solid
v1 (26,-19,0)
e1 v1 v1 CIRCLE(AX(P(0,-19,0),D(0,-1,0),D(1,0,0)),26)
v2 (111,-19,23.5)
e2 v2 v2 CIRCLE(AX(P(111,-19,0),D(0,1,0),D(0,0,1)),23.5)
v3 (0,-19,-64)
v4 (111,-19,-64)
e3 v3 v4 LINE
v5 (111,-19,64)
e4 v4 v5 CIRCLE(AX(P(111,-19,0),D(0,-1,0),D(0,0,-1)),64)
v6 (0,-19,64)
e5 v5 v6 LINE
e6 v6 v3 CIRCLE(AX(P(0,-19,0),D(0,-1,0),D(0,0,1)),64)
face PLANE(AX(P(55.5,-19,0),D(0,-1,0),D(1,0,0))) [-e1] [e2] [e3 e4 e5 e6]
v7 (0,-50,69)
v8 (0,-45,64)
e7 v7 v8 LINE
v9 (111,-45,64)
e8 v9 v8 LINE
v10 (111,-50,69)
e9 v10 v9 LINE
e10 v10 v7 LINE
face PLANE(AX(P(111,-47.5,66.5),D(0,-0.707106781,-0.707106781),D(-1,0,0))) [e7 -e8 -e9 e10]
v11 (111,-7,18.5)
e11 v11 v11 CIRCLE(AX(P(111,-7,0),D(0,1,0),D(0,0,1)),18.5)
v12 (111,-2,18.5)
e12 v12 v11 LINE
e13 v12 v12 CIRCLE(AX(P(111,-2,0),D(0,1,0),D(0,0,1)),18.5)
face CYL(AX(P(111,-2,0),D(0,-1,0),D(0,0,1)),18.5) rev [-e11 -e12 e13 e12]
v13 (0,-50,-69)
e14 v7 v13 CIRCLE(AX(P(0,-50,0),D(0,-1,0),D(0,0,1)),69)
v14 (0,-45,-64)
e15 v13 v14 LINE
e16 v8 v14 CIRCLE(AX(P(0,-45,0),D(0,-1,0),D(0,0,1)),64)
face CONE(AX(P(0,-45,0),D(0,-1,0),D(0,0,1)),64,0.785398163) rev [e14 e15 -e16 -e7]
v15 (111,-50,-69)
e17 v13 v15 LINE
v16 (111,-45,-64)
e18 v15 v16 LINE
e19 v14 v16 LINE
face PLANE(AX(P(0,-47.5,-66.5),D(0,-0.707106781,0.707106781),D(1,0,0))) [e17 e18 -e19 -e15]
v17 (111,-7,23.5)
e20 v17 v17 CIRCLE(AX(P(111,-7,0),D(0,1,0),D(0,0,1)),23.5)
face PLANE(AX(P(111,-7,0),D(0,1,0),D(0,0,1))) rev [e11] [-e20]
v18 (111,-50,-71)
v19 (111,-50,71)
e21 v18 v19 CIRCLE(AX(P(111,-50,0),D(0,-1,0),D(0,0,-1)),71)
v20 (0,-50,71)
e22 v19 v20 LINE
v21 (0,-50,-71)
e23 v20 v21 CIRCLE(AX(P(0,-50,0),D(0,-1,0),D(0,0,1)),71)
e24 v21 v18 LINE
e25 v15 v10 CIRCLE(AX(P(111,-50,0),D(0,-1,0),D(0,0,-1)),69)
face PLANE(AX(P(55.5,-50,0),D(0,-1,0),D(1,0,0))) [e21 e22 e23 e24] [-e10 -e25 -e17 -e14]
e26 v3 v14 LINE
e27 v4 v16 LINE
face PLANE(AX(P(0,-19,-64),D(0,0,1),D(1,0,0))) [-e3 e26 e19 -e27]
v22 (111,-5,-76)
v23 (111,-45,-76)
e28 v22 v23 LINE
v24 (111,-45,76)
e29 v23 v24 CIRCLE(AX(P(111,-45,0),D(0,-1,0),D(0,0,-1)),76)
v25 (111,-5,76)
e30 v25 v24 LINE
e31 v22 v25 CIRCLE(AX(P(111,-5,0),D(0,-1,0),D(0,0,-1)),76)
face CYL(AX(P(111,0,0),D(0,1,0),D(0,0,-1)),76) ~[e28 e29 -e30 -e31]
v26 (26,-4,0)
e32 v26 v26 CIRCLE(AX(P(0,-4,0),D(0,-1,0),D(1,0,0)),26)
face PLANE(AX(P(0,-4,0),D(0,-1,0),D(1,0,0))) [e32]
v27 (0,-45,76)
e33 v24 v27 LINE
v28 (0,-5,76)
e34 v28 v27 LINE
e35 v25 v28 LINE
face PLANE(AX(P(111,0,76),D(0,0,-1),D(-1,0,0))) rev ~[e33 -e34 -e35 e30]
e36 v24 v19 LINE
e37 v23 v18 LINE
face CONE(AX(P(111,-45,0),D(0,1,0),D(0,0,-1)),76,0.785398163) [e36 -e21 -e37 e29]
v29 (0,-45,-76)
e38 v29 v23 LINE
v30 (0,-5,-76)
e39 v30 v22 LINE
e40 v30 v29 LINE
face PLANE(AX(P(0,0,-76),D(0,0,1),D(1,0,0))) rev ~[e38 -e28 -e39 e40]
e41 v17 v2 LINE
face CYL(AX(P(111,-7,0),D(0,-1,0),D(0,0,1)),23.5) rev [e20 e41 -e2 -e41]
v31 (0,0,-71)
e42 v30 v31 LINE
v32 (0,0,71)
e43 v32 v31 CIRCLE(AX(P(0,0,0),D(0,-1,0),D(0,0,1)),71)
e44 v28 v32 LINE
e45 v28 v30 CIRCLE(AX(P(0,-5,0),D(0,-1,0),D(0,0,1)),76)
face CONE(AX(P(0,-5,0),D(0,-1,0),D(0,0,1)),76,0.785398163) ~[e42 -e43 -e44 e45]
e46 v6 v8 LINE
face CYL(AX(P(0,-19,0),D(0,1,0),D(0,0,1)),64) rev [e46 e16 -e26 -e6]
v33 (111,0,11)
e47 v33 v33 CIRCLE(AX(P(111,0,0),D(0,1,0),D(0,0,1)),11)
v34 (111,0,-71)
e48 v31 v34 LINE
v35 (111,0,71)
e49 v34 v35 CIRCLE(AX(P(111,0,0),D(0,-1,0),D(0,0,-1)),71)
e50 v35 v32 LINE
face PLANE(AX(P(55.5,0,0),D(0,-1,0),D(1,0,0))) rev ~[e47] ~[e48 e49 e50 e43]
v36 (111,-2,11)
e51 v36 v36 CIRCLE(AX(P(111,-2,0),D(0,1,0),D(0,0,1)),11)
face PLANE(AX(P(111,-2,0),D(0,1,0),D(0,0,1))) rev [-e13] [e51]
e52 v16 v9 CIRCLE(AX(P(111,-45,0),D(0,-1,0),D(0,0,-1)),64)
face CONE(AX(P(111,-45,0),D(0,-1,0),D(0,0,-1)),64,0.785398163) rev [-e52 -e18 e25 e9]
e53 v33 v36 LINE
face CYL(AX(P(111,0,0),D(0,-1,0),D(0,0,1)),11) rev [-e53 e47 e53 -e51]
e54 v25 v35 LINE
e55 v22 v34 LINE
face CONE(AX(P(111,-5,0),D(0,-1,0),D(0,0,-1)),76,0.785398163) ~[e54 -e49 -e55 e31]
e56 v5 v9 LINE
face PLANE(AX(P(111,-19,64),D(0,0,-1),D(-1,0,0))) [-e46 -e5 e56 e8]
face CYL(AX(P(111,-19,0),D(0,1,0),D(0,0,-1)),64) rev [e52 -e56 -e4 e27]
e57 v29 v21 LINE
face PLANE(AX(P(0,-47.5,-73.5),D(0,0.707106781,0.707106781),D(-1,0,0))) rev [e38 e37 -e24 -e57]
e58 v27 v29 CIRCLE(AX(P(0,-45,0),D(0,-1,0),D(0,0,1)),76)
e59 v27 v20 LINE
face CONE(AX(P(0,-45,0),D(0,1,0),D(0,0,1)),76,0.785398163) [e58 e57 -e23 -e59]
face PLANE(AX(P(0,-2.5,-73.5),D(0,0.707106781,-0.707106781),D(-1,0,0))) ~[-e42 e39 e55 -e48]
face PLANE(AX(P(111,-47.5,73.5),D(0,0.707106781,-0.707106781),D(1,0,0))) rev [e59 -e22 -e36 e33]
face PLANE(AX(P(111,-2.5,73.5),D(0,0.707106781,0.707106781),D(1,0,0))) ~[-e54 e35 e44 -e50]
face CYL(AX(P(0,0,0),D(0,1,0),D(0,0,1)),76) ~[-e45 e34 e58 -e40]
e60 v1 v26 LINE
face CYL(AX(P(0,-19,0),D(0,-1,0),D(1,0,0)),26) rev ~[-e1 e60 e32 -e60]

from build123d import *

# Parameters (mm, degrees)
F1_DEPTH = 50
F4_DEPTH = 60
F5_R     = 26
F6_DEPTH = 15
F10_SIZE = 5
F11_SIZE = 5
F12_SIZE = 5


with BuildPart() as f1:
    # F0 (on Front) → F1 (new body)
    with BuildSketch(Plane.XZ):
        with BuildLine():
            Line((111, 76), (0, 76))
            ThreePointArc((0, 76), (-76, 0), (0, -76))
            Line((0, -76), (111, -76))
            ThreePointArc((111, -76), (187, 0), (111, 76))
        make_face()
    extrude(amount=F1_DEPTH)

    # F3 (on offset) + F1_face (on face) → F4 (cut)
    with BuildSketch(Plane.XZ.offset(19)):
        with BuildLine():
            Line((111, 64), (0, 64))
            ThreePointArc((0, 64), (-64, 0), (0, -64))
            Line((0, -64), (111, -64))
            ThreePointArc((111, -64), (175, 0), (111, 64))
        make_face()
    with BuildSketch(Plane(origin=(55.5, -50, 0), x_dir=(1, 0, 0), z_dir=(0, -1, 0))):
        with BuildLine():
            Line((55.5, 76), (-55.5, 76))
            ThreePointArc((-55.5, 76), (-131.5, 0), (-55.5, -76))
            Line((-55.5, -76), (55.5, -76))
            ThreePointArc((55.5, -76), (131.5, 0), (55.5, 76))
        make_face()
    extrude(amount=F4_DEPTH, mode=Mode.SUBTRACT)

    # F5 (on offset) → F6 (cut)
    with BuildSketch(Plane.XZ.offset(19)):
        Circle(F5_R)
    extrude(amount=-F6_DEPTH, mode=Mode.SUBTRACT)

    # F8 (on offset) → F9 (revolve, cut)
    with BuildSketch(Plane.YZ.offset(111)):
        Polygon((0, 0), (0, 11), (-2, 11), (-2, 18.5), (-7, 18.5), (-7, 23.5), (-19, 23.5), (-19, 0), align=None)
    revolve(axis=Axis((111, -9.5, 0), (0, 1, 0)), mode=Mode.SUBTRACT)

    # F10
    f10_edges = [f1.edges().sort_by_distance(p)[0] for p in [
        (55.5, 0, 76),
        (187, 0, 0),
        (-76, 0, 0),
        (55.5, 0, -76),
    ]]
    chamfer(f10_edges, length=F10_SIZE)

    # F11
    f11_edges = [f1.edges().sort_by_distance(p)[0] for p in [
        (55.5, -50, 76),
        (-76, -50, 0),
        (187, -50, 0),
        (55.5, -50, -76),
    ]]
    chamfer(f11_edges, length=F11_SIZE)

    # F12
    f12_edges = [f1.edges().sort_by_distance(p)[0] for p in [
        (55.5, -50, 64),
        (-64, -50, 0),
        (55.5, -50, -64),
        (175, -50, 0),
    ]]
    chamfer(f12_edges, length=F12_SIZE)


solid = f1.part
